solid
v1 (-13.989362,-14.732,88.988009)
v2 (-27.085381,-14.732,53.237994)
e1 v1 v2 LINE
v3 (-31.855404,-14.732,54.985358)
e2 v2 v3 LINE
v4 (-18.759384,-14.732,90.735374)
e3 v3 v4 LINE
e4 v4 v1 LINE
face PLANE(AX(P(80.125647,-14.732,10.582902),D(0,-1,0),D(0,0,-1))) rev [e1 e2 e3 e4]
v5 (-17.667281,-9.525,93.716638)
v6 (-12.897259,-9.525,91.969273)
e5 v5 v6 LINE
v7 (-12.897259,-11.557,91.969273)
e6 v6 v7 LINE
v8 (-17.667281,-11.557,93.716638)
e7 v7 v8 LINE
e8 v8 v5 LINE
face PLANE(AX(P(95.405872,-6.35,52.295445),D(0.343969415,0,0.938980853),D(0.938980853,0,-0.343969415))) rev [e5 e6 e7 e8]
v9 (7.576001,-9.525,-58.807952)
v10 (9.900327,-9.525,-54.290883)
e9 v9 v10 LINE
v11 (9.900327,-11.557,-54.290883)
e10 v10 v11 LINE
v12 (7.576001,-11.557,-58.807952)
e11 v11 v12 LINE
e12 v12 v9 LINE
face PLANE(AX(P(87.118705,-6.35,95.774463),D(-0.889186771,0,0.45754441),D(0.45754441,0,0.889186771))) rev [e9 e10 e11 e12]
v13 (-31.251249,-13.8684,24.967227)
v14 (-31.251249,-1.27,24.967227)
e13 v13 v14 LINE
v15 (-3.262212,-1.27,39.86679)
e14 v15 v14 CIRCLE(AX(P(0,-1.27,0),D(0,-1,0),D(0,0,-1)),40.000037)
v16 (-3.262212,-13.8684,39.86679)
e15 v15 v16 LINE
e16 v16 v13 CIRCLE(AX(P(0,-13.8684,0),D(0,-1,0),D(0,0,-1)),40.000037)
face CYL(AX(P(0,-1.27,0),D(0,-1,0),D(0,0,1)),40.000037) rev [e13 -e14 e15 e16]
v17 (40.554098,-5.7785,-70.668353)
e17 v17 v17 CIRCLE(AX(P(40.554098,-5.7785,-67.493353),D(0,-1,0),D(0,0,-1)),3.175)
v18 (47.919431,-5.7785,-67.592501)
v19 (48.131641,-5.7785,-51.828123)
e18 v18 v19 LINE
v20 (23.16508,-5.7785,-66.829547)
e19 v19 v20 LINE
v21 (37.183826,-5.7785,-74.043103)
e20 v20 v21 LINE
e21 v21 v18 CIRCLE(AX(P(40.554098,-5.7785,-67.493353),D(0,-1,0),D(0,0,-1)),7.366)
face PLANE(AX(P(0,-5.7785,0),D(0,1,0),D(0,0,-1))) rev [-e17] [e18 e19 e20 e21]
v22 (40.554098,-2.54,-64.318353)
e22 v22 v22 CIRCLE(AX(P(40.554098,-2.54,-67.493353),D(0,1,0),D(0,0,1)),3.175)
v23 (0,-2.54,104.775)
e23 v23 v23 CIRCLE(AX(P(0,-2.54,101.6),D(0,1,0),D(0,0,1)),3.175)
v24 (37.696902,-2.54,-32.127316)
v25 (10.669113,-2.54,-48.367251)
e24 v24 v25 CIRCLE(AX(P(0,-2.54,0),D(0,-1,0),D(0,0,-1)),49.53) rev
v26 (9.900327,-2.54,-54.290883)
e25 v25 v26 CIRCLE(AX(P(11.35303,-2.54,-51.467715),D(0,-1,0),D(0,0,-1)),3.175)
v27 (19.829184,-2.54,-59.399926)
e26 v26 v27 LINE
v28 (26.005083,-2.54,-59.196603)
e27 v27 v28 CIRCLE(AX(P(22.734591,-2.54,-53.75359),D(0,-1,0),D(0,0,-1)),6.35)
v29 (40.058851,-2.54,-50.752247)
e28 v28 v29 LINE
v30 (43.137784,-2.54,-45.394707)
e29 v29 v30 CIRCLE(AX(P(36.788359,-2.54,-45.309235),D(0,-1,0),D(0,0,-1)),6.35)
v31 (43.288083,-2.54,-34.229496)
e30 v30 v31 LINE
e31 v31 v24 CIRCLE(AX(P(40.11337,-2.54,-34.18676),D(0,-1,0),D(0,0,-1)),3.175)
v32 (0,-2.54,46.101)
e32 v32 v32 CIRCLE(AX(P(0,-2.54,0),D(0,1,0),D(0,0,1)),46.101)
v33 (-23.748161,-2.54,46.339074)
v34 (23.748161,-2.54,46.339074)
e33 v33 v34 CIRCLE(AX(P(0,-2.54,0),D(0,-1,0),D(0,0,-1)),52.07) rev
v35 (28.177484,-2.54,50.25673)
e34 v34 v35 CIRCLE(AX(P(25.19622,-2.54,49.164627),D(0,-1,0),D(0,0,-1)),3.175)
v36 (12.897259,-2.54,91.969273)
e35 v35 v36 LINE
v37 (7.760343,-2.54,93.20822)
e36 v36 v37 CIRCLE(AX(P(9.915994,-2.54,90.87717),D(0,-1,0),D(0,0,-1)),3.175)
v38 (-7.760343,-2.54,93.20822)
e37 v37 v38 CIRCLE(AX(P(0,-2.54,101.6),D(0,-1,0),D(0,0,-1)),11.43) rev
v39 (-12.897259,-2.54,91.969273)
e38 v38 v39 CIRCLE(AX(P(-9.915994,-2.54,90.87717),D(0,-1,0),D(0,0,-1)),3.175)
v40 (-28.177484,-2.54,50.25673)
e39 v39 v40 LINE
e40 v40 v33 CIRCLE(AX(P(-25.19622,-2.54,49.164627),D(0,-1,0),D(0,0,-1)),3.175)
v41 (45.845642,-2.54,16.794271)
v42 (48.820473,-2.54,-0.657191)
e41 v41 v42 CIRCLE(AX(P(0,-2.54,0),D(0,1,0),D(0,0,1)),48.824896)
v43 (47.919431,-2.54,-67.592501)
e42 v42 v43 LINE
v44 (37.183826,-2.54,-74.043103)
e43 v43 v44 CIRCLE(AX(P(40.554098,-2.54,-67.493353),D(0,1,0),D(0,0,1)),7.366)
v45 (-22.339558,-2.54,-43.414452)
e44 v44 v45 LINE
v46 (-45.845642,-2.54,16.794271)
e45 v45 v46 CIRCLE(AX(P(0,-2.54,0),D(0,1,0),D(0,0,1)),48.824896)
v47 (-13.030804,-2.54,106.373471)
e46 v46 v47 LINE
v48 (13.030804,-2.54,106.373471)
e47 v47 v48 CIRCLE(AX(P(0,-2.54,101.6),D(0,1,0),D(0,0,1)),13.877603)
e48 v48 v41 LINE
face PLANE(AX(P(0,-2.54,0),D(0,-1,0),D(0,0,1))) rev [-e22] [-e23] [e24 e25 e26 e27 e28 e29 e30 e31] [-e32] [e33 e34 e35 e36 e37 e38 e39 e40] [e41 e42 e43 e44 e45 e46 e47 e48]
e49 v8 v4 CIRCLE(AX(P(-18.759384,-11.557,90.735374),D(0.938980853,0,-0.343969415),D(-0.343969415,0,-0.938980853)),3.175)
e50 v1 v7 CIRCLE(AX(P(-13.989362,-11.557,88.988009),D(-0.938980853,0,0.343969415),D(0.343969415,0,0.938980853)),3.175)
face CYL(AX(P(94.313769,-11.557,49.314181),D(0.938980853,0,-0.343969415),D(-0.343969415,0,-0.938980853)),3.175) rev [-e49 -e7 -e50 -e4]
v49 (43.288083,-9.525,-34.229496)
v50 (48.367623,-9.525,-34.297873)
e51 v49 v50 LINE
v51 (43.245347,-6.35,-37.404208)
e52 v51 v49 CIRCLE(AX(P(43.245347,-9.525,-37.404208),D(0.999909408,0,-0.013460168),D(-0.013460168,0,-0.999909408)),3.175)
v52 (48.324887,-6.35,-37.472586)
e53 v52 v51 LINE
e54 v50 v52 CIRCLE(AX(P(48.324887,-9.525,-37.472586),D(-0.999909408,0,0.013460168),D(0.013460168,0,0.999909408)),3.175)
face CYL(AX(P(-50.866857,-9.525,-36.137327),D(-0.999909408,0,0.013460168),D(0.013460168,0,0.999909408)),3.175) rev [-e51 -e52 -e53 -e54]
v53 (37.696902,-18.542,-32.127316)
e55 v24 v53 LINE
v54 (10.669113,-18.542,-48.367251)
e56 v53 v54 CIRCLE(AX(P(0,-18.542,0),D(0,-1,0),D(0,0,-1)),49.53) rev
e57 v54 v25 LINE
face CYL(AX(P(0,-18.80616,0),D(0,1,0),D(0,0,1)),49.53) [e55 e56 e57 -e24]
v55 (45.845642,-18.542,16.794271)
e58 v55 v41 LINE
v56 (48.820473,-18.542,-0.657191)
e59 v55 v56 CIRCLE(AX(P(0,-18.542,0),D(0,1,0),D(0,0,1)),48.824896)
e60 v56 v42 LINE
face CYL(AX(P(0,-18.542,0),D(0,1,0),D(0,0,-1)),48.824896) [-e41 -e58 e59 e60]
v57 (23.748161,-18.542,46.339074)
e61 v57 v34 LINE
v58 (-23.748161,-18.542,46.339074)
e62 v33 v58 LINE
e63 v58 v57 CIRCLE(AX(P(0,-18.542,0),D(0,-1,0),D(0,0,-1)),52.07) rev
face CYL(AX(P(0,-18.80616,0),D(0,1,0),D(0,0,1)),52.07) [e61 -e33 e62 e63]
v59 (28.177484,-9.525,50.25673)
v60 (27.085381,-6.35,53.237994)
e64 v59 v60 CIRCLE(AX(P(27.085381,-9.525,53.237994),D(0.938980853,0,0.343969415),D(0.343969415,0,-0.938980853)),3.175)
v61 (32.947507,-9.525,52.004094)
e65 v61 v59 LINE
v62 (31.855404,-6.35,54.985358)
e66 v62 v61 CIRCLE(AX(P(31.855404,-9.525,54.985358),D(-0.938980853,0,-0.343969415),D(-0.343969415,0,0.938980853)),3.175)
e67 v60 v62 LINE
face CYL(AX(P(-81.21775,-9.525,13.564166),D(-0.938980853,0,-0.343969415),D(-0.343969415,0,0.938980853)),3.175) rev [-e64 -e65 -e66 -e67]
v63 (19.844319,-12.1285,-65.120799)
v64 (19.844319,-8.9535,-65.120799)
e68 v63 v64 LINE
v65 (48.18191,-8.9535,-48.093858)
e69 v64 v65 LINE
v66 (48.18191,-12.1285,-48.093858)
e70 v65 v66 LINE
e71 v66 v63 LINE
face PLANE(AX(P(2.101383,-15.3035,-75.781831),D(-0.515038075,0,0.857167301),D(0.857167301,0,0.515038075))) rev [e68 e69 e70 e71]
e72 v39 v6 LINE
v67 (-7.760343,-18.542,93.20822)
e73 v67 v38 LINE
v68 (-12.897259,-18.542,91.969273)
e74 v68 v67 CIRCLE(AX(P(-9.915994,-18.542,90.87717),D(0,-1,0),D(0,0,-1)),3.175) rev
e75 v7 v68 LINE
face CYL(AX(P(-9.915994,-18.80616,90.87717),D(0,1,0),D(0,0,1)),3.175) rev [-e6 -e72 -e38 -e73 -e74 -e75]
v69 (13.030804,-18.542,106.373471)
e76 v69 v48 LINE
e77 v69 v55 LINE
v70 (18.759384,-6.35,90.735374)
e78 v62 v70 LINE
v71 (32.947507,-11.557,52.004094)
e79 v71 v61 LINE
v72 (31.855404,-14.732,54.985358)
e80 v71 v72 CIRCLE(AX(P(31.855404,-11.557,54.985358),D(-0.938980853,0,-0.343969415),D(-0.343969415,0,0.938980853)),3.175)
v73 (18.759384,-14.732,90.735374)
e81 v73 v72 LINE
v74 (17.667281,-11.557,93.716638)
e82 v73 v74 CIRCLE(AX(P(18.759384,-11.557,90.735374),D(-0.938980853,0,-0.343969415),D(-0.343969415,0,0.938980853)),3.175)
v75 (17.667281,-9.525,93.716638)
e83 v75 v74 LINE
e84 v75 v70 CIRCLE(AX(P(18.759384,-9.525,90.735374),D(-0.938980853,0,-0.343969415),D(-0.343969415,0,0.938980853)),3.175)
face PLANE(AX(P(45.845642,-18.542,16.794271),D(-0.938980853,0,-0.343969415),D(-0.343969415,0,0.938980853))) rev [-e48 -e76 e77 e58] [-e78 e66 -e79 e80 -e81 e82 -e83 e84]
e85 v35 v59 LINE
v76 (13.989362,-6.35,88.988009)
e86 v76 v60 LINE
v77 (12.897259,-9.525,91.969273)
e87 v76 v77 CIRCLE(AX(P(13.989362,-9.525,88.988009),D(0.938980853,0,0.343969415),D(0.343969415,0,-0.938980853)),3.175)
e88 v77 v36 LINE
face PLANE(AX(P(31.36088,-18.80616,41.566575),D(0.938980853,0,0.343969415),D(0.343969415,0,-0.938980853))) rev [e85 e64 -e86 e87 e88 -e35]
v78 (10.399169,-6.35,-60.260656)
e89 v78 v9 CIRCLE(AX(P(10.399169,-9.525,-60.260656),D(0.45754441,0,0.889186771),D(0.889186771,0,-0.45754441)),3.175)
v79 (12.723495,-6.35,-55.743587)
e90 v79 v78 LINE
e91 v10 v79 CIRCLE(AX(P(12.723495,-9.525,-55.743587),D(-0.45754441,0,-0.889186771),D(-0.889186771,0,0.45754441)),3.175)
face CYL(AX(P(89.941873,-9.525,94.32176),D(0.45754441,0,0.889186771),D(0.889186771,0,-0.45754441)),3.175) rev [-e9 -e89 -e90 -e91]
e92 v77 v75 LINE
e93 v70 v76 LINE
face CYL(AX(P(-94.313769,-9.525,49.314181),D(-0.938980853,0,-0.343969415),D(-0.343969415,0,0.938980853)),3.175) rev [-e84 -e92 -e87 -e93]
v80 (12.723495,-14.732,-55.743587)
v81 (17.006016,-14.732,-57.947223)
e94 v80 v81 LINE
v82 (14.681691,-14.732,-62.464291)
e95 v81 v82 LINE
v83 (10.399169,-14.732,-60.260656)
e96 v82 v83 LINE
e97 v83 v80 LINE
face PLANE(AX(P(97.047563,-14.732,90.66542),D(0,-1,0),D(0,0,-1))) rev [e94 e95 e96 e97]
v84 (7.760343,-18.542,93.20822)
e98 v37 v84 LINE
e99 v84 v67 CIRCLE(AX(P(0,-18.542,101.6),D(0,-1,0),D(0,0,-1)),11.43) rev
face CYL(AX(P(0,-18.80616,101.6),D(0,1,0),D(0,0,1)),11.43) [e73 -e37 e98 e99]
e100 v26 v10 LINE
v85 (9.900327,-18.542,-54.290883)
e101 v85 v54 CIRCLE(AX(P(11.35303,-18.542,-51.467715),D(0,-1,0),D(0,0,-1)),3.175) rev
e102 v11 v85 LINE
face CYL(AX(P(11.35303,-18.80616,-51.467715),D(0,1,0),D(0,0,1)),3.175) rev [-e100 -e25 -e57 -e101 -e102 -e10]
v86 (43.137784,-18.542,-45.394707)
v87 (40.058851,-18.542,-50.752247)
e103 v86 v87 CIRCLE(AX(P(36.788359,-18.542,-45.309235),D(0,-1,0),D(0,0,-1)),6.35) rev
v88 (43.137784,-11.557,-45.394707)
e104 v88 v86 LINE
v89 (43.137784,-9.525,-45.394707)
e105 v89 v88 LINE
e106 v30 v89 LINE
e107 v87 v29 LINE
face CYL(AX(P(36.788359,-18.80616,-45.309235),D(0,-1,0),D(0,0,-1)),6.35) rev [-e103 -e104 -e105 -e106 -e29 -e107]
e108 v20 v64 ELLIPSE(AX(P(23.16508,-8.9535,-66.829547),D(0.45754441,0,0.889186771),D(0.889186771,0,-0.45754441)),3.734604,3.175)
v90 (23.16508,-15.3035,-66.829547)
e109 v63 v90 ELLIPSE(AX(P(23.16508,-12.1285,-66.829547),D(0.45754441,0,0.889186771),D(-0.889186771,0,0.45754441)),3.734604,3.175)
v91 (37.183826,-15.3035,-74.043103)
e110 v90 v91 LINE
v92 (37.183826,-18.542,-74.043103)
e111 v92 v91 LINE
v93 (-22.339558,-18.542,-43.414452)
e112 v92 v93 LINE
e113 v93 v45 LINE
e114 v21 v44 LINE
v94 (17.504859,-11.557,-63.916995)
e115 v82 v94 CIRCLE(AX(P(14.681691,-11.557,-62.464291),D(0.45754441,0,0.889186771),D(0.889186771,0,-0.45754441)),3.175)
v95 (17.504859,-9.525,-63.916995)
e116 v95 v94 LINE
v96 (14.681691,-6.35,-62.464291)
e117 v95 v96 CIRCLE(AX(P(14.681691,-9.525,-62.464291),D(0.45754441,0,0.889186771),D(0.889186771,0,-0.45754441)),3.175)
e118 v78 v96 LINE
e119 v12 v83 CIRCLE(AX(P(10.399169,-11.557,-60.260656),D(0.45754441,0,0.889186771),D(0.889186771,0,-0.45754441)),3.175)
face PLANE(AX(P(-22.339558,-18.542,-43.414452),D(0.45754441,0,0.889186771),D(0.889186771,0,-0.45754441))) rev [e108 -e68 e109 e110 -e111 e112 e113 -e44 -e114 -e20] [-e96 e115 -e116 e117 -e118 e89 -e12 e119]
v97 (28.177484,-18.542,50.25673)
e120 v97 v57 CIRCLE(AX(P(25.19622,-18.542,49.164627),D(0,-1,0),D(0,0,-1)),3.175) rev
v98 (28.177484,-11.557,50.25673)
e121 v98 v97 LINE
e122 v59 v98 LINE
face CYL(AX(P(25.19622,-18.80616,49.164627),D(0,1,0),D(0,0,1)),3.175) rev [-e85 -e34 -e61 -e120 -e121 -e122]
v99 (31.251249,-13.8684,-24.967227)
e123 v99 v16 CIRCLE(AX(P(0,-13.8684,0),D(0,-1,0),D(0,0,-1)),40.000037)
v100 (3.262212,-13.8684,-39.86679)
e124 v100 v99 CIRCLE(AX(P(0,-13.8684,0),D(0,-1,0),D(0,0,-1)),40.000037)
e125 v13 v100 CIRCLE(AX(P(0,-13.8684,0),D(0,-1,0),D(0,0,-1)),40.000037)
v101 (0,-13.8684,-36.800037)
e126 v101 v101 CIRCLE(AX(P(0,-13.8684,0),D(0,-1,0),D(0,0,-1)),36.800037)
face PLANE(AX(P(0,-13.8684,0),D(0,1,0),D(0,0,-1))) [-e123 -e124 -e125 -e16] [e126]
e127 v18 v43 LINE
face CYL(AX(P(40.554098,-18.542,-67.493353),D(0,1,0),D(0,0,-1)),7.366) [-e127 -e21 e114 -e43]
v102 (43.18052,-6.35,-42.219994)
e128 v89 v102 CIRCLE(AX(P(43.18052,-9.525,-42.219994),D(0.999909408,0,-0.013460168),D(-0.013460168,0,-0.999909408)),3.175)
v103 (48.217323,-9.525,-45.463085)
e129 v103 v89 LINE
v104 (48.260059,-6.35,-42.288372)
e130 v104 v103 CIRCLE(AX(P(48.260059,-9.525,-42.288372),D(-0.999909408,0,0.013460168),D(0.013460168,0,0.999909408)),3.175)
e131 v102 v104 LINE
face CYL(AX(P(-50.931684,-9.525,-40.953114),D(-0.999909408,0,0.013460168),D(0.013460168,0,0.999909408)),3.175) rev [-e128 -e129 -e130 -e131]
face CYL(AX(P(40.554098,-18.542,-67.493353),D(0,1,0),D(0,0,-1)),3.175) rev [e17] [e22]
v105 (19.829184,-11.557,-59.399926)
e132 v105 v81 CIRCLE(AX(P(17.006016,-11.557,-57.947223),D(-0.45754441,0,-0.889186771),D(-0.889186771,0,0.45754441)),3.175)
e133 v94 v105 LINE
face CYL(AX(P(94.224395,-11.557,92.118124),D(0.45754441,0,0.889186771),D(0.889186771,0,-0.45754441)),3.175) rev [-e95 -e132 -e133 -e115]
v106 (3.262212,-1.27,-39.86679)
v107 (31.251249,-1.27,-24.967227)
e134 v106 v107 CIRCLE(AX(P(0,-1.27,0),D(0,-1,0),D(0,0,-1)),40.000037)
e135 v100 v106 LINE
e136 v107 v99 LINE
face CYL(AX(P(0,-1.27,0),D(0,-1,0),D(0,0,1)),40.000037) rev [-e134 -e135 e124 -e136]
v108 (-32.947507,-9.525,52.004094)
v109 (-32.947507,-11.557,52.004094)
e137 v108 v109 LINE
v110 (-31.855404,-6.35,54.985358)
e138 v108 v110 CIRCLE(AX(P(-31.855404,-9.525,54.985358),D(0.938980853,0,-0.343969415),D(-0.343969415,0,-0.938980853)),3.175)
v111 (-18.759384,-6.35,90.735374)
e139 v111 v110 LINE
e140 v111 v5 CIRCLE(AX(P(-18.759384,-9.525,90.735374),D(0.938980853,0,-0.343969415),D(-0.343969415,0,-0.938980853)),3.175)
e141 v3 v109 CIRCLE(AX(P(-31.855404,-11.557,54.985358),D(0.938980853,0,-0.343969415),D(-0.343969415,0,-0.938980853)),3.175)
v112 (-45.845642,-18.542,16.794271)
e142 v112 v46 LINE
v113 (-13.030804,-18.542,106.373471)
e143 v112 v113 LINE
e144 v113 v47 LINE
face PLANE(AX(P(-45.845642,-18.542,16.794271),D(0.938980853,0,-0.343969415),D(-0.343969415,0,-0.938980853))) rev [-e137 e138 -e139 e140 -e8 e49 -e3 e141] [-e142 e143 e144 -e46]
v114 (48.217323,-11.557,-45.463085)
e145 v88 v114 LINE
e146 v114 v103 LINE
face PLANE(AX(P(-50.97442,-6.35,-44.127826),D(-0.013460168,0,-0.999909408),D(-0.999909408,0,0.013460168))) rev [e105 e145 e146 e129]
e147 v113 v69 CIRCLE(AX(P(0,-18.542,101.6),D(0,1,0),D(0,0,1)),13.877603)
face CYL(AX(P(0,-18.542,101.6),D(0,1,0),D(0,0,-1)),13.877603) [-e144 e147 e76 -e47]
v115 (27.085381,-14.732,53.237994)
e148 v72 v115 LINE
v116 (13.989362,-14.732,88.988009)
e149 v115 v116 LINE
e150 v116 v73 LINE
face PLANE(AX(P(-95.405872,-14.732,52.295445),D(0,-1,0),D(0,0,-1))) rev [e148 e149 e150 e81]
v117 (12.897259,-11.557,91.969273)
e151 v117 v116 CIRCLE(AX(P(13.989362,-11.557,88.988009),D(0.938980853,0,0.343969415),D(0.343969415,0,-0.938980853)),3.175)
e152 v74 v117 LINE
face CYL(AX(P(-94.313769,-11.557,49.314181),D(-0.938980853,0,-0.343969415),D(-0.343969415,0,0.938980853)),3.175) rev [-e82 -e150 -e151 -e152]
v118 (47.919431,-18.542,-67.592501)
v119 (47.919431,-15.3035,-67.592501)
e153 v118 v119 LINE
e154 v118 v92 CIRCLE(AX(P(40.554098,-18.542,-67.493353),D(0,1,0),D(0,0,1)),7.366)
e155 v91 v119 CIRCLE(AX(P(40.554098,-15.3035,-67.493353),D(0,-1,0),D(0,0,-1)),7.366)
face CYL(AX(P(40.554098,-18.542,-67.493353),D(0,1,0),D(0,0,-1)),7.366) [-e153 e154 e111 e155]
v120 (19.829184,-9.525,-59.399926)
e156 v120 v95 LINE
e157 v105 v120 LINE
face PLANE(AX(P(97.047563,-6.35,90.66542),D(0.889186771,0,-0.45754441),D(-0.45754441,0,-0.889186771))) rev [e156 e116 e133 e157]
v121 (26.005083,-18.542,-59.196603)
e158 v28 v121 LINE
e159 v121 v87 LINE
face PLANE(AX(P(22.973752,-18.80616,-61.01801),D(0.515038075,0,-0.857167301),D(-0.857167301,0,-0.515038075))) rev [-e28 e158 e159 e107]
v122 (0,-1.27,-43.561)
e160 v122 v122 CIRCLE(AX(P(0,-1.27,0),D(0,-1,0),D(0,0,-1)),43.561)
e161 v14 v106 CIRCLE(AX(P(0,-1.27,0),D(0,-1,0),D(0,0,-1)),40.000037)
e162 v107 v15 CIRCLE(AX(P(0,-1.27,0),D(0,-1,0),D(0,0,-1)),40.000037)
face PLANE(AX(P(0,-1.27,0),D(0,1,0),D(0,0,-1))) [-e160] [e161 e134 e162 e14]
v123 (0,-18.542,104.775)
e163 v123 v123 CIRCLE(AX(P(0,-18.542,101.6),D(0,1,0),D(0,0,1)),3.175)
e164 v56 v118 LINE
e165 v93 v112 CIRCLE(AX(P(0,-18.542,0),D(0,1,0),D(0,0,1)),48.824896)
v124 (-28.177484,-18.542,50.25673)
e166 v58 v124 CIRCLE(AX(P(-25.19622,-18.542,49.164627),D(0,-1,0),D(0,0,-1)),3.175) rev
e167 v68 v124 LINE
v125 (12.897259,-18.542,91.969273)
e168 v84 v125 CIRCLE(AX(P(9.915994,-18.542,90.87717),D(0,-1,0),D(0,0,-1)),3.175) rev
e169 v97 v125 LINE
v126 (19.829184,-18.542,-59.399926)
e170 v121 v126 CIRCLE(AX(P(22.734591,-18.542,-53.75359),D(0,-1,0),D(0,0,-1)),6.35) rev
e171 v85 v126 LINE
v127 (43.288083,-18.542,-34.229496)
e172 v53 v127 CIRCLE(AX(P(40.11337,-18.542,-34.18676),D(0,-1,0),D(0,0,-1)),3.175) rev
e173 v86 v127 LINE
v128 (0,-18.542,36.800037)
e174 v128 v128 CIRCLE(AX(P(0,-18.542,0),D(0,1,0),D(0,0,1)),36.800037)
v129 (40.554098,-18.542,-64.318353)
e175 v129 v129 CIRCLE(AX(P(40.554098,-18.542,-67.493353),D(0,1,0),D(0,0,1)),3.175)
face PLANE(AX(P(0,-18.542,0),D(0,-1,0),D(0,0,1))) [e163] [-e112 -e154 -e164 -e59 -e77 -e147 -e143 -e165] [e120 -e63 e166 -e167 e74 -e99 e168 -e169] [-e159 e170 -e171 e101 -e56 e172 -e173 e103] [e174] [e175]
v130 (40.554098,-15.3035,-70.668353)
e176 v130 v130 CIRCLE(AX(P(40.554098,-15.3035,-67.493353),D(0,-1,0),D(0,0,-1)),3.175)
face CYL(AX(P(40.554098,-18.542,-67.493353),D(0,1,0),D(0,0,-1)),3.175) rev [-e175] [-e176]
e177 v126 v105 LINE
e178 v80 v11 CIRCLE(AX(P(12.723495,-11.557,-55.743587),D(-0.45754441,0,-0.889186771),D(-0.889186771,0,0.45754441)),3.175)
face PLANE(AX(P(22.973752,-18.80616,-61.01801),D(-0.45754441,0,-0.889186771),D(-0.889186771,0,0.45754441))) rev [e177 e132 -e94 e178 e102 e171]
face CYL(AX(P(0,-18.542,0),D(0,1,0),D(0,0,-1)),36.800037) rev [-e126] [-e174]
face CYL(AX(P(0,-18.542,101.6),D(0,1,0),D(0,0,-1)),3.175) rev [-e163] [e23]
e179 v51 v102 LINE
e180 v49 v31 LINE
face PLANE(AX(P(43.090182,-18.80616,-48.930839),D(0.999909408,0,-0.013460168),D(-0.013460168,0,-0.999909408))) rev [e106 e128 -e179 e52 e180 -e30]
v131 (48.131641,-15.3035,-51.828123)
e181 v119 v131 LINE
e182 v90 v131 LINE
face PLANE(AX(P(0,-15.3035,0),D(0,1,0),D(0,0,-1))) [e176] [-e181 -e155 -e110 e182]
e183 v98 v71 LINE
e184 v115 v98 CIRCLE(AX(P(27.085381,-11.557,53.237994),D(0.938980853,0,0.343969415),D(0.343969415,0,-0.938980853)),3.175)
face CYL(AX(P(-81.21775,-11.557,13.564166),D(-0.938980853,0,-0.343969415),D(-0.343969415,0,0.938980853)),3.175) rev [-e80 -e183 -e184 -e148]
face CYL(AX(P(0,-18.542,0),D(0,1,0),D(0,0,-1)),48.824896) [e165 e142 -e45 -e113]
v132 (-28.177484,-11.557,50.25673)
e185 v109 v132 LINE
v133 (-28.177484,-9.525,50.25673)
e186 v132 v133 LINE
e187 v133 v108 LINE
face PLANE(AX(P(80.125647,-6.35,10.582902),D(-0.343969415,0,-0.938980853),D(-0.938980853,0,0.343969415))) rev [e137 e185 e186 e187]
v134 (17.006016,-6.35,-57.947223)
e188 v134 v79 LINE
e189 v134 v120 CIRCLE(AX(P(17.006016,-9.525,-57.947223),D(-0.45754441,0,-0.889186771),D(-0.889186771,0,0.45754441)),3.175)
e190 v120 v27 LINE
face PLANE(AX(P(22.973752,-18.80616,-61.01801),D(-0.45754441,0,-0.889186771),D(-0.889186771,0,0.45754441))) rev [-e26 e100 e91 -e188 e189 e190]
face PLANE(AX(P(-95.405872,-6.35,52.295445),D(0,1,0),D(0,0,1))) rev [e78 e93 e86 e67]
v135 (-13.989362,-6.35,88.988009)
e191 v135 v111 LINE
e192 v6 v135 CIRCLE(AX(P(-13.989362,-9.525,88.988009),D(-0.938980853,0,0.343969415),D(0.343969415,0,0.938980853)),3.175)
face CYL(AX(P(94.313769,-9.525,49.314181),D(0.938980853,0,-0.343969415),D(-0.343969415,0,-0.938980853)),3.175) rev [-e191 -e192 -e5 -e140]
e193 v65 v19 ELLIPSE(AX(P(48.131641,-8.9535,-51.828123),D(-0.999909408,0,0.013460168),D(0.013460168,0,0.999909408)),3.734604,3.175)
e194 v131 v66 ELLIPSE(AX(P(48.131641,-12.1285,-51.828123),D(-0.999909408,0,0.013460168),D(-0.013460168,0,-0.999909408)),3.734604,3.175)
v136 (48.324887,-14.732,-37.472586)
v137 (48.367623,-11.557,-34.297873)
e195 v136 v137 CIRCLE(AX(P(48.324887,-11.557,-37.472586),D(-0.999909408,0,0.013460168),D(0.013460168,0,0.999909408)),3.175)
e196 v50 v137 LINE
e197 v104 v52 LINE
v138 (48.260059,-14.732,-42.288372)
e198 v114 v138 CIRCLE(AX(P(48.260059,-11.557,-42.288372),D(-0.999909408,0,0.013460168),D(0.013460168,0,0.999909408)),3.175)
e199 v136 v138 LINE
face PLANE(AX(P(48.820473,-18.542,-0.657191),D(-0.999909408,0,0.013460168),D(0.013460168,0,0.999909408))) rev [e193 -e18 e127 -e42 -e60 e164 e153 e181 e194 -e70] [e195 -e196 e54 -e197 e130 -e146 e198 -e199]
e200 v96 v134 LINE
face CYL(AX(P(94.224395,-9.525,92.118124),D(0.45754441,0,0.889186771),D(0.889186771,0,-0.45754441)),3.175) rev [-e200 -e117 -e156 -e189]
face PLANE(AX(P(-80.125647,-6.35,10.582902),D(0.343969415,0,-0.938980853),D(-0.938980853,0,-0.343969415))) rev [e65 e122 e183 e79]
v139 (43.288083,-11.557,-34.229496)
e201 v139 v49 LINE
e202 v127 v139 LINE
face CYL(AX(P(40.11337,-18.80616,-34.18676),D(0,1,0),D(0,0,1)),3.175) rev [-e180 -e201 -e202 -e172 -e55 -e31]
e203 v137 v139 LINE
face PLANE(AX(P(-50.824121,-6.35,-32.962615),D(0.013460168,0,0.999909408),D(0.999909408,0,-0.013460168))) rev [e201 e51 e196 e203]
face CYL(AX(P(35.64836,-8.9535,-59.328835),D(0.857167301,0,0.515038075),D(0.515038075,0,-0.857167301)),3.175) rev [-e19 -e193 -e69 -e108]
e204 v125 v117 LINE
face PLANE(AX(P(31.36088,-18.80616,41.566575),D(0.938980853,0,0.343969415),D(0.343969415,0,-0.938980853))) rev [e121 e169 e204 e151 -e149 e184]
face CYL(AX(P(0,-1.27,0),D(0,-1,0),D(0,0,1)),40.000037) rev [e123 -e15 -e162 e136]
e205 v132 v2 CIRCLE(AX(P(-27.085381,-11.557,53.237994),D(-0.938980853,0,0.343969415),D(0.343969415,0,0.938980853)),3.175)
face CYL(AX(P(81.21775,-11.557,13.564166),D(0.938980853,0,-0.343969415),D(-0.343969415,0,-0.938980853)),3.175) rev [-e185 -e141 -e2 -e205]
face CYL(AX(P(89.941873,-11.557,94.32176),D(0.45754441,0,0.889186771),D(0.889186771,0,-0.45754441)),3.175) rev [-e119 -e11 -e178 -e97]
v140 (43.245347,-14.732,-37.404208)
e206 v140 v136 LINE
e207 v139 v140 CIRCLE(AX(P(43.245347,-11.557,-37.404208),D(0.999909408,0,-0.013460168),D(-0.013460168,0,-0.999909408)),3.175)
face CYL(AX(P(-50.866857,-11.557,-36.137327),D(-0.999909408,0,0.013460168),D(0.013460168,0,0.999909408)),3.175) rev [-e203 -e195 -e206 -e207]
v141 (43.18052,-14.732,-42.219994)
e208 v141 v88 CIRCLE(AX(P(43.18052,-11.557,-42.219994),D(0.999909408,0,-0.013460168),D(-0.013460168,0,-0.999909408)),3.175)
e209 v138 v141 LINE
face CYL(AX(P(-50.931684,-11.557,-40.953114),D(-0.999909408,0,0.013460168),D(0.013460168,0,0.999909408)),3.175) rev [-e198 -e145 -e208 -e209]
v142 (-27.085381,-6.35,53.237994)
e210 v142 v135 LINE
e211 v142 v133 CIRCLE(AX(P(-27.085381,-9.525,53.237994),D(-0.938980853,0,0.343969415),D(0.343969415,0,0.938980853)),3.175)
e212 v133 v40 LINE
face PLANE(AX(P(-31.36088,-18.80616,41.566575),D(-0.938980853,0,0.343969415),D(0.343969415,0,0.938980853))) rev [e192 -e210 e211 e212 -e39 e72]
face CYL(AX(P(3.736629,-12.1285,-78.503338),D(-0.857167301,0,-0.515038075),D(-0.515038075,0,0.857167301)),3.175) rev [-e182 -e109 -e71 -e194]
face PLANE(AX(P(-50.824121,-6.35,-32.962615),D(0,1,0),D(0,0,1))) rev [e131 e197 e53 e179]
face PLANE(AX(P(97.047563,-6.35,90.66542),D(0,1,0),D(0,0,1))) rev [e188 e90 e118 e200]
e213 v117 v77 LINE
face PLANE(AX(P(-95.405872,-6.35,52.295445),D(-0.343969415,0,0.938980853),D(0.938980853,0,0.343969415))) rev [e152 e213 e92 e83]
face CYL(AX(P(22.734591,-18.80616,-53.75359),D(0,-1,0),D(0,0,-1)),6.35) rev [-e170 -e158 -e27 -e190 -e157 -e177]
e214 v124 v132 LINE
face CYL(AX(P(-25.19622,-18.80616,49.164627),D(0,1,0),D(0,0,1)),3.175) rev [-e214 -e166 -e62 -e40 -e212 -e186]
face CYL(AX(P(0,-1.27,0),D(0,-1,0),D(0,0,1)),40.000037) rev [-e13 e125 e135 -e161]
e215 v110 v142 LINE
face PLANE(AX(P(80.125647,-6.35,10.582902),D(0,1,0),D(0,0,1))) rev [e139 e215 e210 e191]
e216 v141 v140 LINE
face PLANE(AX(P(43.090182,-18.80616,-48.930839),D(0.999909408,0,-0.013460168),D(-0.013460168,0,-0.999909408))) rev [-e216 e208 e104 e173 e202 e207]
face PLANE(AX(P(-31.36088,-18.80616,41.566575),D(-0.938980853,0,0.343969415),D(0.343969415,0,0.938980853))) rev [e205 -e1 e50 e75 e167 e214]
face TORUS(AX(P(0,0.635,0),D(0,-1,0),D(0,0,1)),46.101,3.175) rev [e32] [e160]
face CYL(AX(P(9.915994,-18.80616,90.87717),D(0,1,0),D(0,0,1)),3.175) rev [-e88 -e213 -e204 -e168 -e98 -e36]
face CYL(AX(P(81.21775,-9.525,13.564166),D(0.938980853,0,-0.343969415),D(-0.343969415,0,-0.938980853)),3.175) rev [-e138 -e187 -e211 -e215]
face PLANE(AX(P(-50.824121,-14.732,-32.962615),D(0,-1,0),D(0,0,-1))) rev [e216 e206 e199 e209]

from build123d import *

# Parameters (mm, degrees)
SKETCH1_R           = 36.800037017
SKETCH1_R_2         = 3.175
BOSS_EXTRUDE1_DEPTH = 16.002
SKETCH5_R           = 43.561
SKETCH5_R_2         = 40.000036967
BOSS_EXTRUDE3_DEPTH = 1.27
SKETCH6_R           = 40.000036967
SKETCH6_R_2         = 36.800037017
CUT_EXTRUDE2_DEPTH  = 11.3284
FILLET2_R           = 3.175
CUT_EXTRUDE3_DEPTH  = 4.7625
CUT_EXTRUDE4_DEPTH  = 18.80616
FILLET3_R           = 3.175
FILLET5_R           = 6.35
CUT_EXTRUDE5_REACH  = 140.003
SKETCH22_W          = 44.42320982
SKETCH22_H          = 8.382
CUT_EXTRUDE6_REACH  = 140.003
SKETCH23_W          = 44.42320982
SKETCH23_H          = 8.382
CUT_EXTRUDE7_REACH  = 154.858
SKETCH24_W          = 11.166222722
SKETCH24_H          = 8.382
CUT_EXTRUDE8_REACH  = 177.085
SKETCH25_W          = 11.166222722
SKETCH25_H          = 8.382
FILLET6_R           = 3.175


with BuildPart() as part:
    # Sketch1 → Boss-Extrude1 (new body)
    with BuildSketch(Plane(origin=(0, 0, 0), x_dir=(1, 0, 0), z_dir=(0, 1, 0))):
        with BuildLine():
            Line((-45.845642474, -16.794270915), (-13.030803906, -106.373471135))
            ThreePointArc((-13.030803906, -106.373471135), (0, -115.477603436), (13.030803906, -106.373471135))
            Line((13.030803906, -106.373471135), (45.845642474, -16.794270915))
            ThreePointArc((45.845642474, -16.794270915), (48.13062155, -8.204495023), (48.820472847, 0.657191296))
            Line((48.820472847, 0.657191296), (47.919430717, 67.592500854))
            ThreePointArc((47.919430717, 67.592500854), (44.347868478, 73.807247594), (37.183825898, 74.043103011))
            Line((37.183825898, 74.043103011), (-22.33955821, 43.414451608))
            ThreePointArc((-22.33955821, 43.414451608), (-45.481622278, 17.756477815), (-45.845642474, -16.794270915))
        make_face()
        with Locations(Location((0, 0, 0), (0, 0, 270))):
            Circle(SKETCH1_R, mode=Mode.SUBTRACT)
        with Locations(Location((0, -101.6, 0), (0, 0, 270))):
            Circle(SKETCH1_R_2, mode=Mode.SUBTRACT)
        with Locations(Location((40.554098018, 67.493353257, 0), (0, 0, 270))):
            Circle(SKETCH1_R_2, mode=Mode.SUBTRACT)
    extrude(amount=BOSS_EXTRUDE1_DEPTH)

    # Sketch5 → Boss-Extrude3 (add)
    with BuildSketch(Plane.XZ):
        with Locations(Location((0, 0, 0), (0, 0, 90))):
            Circle(SKETCH5_R)
        with Locations(Location((0, 0, 0), (0, 0, 270))):
            Circle(SKETCH5_R_2, mode=Mode.SUBTRACT)
    extrude(amount=BOSS_EXTRUDE3_DEPTH)

    # Sketch6 → Cut-Extrude2 (cut)
    with BuildSketch(Plane.XZ):
        with Locations(Location((0, 0, 0), (0, 0, 270))):
            Circle(SKETCH6_R)
        with Locations(Location((0, 0, 0), (0, 0, 270))):
            Circle(SKETCH6_R_2, mode=Mode.SUBTRACT)
    extrude(amount=-CUT_EXTRUDE2_DEPTH, mode=Mode.SUBTRACT)

    # Fillet2
    # the kernel refuses this fillet: 3.175 mm, written as the material it adds along each edge
    with BuildSketch(Plane(origin=(0, 0, 0), x_dir=(0, 0, 1), z_dir=(1, 0, 0))) as fillet2_piece_1:
        with BuildLine():
            CenterArc((46.101, 3.175), FILLET2_R, 216.869897646, 53.130102354)
            Line((46.101, 0), (46.101, -0.0635))
            Line((46.101, -0.0635), (43.561, -0.0635))
            Line((43.561, -0.0635), (43.4975, 0))
            ThreePointArc((43.4975, 0), (43.4975, 0.635), (43.5102, 1.2319))
            Line((43.5102, 1.2319), (43.561, 1.27))
        make_face()
    revolve(axis=Axis((0, 0, 0), (0, -1, 0)))

    # Sketch7 → Cut-Extrude3 (cut, symmetric)
    with BuildSketch(Plane(origin=(0, 8.001, 0), x_dir=(-1, 0, 0), z_dir=(0, -1, 0))):
        Polygon((-8.642366299, 86.667856133), (-2.101382747, 75.781831414), (-66.916726186, 36.836844033), (-73.457709737, 47.722868752), (-97.309602446, 87.419084403), (-32.494259008, 126.364071784), align=None)
    extrude(amount=CUT_EXTRUDE3_DEPTH, both=True, mode=Mode.SUBTRACT)


with BuildPart() as body_2:
    # Mirror1: mirrored copy
    add(part.part.mirror(Plane(origin=(0, -1.27, 0), x_dir=(0, 0, 1), z_dir=(0, -1, 0))))

    # Sketch9 → Cut-Extrude4 (cut)
    with BuildSketch(Plane(origin=(0, 0, 0), x_dir=(1, 0, 0), z_dir=(0, 1, 0))):
        with BuildLine():
            Line((22.973751547, 61.018010354), (43.090182322, 48.930839307))
            Line((43.090182322, 48.930839307), (43.428261446, 23.816108157))
            ThreePointArc((43.428261446, 23.816108157), (25.50983585, 42.455496404), (0.640041598, 49.525864422))
            Line((0.640041598, 49.525864422), (22.973751547, 61.018010354))
        make_face()
        with BuildLine():
            Line((-31.360879833, -41.566574505), (-10.770746379, -97.774307586))
            ThreePointArc((-10.770746379, -97.774307586), (0, -90.17), (10.770746379, -97.774307586))
            Line((10.770746379, -97.774307586), (31.360879833, -41.566574505))
            ThreePointArc((31.360879833, -41.566574505), (0, -52.07), (-31.360879833, -41.566574505))
        make_face()
    extrude(amount=-CUT_EXTRUDE4_DEPTH, mode=Mode.SUBTRACT)

    # Fillet3
    fillet3_edges = [body_2.edges().sort_by_distance(p)[0] for p in [
        (0.640041598, -10.541, -49.525864422),
        (43.428261446, -10.541, -23.816108157),
        (-31.360879833, -10.541, 41.566574505),
        (31.360879833, -10.541, 41.566574505),
        (10.770746379, -10.541, 97.774307586),
        (-10.770746379, -10.541, 97.774307586),
        (34.013114467, -15.3035, -56.607328538),
        (34.013114467, -5.7785, -56.607328538),
    ]]
    fillet(fillet3_edges, radius=FILLET3_R)

    # Fillet5
    fillet5_edges = [body_2.edges().sort_by_distance(p)[0] for p in [
        (22.973751547, -10.541, -61.018010354),
        (43.090182322, -10.541, -48.930839307),
    ]]
    fillet(fillet5_edges, radius=FILLET5_R)

    # Sketch22 → Cut-Extrude5 (cut, up to next)
    with BuildSketch(Plane(origin=(45.845642474, 0, 16.794270915), x_dir=(0.34396941500000017, 0, -0.9389808525974094), z_dir=(0.9389808525974093, 0, 0.3439694150000001)), mode=Mode.PRIVATE) as cut_extrude5_sk1:
        with Locations((-59.709519033, -10.541)):
            Rectangle(SKETCH22_W, SKETCH22_H)
    cut_extrude5_tool1 = extrude(cut_extrude5_sk1.sketch, amount=-CUT_EXTRUDE5_REACH, mode=Mode.PRIVATE) & body_2.part
    add(cut_extrude5_tool1.solids().sort_by_distance((25.307394, -10.541, 72.860366))[0], mode=Mode.SUBTRACT)

    # Sketch23 → Cut-Extrude6 (cut, up to next)
    with BuildSketch(Plane(origin=(-45.845642474, 0, 16.794270915), x_dir=(0.3439694150000003, 0, 0.9389808525974093), z_dir=(-0.9389808525974094, 0, 0.34396941500000033)), mode=Mode.PRIVATE) as cut_extrude6_sk1:
        with Locations((59.709519033, -10.541)):
            Rectangle(SKETCH23_W, SKETCH23_H)
    cut_extrude6_tool1 = extrude(cut_extrude6_sk1.sketch, amount=-CUT_EXTRUDE6_REACH, mode=Mode.PRIVATE) & body_2.part
    add(cut_extrude6_tool1.solids().sort_by_distance((-25.307394, -10.541, 72.860366))[0], mode=Mode.SUBTRACT)

    # Sketch24 → Cut-Extrude7 (cut, up to next)
    with BuildSketch(Plane(origin=(48.820472847, 0, -0.657191296), x_dir=(-0.01346016787133038, 0, -0.9999094078369678), z_dir=(0.9999094078369678, 0, -0.01346016787133038)), mode=Mode.PRIVATE) as cut_extrude7_sk1:
        with Locations((39.22684129, -10.541)):
            Rectangle(SKETCH24_W, SKETCH24_H)
    cut_extrude7_tool1 = extrude(cut_extrude7_sk1.sketch, amount=-CUT_EXTRUDE7_REACH, mode=Mode.PRIVATE) & body_2.part
    add(cut_extrude7_tool1.solids().sort_by_distance((48.292473, -10.541, -39.880479))[0], mode=Mode.SUBTRACT)

    # Sketch25 → Cut-Extrude8 (cut, up to next)
    with BuildSketch(Plane(origin=(-22.33955821, 0, -43.414451608), x_dir=(-0.8891867707725541, 0, 0.4575444095200786), z_dir=(-0.4575444095200785, 0, -0.889186770772554)), mode=Mode.PRIVATE) as cut_extrude8_sk1:
        with Locations((-39.22684129, -10.541)):
            Rectangle(SKETCH25_W, SKETCH25_H)
    cut_extrude8_tool1 = extrude(cut_extrude8_sk1.sketch, amount=-CUT_EXTRUDE8_REACH, mode=Mode.PRIVATE) & body_2.part
    add(cut_extrude8_tool1.solids().sort_by_distance((12.54043, -10.541, -61.362474))[0], mode=Mode.SUBTRACT)

    # Fillet6
    fillet6_edges = [body_2.edges().sort_by_distance(p)[0] for p in [
        (15.28227003, -14.732, 92.842955406),
        (15.28227003, -6.35, 92.842955406),
        (30.562495524, -6.35, 51.130411974),
        (30.562495524, -14.732, 51.130411974),
        (-30.562495524, -14.732, 51.130411974),
        (-30.562495524, -6.35, 51.130411974),
        (-15.28227003, -6.35, 92.842955406),
        (-15.28227003, -14.732, 92.842955406),
        (45.827852698, -14.732, -34.263684541),
        (45.827852698, -6.35, -34.263684541),
        (45.677553466, -6.35, -45.428895691),
        (45.677553466, -14.732, -45.428895691),
        (18.667021686, -14.732, -61.658460536),
        (18.667021686, -6.35, -61.658460536),
        (8.738164162, -6.35, -56.549417754),
        (8.738164162, -14.732, -56.549417754),
    ]]
    fillet(fillet6_edges, radius=FILLET6_R)


solid = body_2.part
